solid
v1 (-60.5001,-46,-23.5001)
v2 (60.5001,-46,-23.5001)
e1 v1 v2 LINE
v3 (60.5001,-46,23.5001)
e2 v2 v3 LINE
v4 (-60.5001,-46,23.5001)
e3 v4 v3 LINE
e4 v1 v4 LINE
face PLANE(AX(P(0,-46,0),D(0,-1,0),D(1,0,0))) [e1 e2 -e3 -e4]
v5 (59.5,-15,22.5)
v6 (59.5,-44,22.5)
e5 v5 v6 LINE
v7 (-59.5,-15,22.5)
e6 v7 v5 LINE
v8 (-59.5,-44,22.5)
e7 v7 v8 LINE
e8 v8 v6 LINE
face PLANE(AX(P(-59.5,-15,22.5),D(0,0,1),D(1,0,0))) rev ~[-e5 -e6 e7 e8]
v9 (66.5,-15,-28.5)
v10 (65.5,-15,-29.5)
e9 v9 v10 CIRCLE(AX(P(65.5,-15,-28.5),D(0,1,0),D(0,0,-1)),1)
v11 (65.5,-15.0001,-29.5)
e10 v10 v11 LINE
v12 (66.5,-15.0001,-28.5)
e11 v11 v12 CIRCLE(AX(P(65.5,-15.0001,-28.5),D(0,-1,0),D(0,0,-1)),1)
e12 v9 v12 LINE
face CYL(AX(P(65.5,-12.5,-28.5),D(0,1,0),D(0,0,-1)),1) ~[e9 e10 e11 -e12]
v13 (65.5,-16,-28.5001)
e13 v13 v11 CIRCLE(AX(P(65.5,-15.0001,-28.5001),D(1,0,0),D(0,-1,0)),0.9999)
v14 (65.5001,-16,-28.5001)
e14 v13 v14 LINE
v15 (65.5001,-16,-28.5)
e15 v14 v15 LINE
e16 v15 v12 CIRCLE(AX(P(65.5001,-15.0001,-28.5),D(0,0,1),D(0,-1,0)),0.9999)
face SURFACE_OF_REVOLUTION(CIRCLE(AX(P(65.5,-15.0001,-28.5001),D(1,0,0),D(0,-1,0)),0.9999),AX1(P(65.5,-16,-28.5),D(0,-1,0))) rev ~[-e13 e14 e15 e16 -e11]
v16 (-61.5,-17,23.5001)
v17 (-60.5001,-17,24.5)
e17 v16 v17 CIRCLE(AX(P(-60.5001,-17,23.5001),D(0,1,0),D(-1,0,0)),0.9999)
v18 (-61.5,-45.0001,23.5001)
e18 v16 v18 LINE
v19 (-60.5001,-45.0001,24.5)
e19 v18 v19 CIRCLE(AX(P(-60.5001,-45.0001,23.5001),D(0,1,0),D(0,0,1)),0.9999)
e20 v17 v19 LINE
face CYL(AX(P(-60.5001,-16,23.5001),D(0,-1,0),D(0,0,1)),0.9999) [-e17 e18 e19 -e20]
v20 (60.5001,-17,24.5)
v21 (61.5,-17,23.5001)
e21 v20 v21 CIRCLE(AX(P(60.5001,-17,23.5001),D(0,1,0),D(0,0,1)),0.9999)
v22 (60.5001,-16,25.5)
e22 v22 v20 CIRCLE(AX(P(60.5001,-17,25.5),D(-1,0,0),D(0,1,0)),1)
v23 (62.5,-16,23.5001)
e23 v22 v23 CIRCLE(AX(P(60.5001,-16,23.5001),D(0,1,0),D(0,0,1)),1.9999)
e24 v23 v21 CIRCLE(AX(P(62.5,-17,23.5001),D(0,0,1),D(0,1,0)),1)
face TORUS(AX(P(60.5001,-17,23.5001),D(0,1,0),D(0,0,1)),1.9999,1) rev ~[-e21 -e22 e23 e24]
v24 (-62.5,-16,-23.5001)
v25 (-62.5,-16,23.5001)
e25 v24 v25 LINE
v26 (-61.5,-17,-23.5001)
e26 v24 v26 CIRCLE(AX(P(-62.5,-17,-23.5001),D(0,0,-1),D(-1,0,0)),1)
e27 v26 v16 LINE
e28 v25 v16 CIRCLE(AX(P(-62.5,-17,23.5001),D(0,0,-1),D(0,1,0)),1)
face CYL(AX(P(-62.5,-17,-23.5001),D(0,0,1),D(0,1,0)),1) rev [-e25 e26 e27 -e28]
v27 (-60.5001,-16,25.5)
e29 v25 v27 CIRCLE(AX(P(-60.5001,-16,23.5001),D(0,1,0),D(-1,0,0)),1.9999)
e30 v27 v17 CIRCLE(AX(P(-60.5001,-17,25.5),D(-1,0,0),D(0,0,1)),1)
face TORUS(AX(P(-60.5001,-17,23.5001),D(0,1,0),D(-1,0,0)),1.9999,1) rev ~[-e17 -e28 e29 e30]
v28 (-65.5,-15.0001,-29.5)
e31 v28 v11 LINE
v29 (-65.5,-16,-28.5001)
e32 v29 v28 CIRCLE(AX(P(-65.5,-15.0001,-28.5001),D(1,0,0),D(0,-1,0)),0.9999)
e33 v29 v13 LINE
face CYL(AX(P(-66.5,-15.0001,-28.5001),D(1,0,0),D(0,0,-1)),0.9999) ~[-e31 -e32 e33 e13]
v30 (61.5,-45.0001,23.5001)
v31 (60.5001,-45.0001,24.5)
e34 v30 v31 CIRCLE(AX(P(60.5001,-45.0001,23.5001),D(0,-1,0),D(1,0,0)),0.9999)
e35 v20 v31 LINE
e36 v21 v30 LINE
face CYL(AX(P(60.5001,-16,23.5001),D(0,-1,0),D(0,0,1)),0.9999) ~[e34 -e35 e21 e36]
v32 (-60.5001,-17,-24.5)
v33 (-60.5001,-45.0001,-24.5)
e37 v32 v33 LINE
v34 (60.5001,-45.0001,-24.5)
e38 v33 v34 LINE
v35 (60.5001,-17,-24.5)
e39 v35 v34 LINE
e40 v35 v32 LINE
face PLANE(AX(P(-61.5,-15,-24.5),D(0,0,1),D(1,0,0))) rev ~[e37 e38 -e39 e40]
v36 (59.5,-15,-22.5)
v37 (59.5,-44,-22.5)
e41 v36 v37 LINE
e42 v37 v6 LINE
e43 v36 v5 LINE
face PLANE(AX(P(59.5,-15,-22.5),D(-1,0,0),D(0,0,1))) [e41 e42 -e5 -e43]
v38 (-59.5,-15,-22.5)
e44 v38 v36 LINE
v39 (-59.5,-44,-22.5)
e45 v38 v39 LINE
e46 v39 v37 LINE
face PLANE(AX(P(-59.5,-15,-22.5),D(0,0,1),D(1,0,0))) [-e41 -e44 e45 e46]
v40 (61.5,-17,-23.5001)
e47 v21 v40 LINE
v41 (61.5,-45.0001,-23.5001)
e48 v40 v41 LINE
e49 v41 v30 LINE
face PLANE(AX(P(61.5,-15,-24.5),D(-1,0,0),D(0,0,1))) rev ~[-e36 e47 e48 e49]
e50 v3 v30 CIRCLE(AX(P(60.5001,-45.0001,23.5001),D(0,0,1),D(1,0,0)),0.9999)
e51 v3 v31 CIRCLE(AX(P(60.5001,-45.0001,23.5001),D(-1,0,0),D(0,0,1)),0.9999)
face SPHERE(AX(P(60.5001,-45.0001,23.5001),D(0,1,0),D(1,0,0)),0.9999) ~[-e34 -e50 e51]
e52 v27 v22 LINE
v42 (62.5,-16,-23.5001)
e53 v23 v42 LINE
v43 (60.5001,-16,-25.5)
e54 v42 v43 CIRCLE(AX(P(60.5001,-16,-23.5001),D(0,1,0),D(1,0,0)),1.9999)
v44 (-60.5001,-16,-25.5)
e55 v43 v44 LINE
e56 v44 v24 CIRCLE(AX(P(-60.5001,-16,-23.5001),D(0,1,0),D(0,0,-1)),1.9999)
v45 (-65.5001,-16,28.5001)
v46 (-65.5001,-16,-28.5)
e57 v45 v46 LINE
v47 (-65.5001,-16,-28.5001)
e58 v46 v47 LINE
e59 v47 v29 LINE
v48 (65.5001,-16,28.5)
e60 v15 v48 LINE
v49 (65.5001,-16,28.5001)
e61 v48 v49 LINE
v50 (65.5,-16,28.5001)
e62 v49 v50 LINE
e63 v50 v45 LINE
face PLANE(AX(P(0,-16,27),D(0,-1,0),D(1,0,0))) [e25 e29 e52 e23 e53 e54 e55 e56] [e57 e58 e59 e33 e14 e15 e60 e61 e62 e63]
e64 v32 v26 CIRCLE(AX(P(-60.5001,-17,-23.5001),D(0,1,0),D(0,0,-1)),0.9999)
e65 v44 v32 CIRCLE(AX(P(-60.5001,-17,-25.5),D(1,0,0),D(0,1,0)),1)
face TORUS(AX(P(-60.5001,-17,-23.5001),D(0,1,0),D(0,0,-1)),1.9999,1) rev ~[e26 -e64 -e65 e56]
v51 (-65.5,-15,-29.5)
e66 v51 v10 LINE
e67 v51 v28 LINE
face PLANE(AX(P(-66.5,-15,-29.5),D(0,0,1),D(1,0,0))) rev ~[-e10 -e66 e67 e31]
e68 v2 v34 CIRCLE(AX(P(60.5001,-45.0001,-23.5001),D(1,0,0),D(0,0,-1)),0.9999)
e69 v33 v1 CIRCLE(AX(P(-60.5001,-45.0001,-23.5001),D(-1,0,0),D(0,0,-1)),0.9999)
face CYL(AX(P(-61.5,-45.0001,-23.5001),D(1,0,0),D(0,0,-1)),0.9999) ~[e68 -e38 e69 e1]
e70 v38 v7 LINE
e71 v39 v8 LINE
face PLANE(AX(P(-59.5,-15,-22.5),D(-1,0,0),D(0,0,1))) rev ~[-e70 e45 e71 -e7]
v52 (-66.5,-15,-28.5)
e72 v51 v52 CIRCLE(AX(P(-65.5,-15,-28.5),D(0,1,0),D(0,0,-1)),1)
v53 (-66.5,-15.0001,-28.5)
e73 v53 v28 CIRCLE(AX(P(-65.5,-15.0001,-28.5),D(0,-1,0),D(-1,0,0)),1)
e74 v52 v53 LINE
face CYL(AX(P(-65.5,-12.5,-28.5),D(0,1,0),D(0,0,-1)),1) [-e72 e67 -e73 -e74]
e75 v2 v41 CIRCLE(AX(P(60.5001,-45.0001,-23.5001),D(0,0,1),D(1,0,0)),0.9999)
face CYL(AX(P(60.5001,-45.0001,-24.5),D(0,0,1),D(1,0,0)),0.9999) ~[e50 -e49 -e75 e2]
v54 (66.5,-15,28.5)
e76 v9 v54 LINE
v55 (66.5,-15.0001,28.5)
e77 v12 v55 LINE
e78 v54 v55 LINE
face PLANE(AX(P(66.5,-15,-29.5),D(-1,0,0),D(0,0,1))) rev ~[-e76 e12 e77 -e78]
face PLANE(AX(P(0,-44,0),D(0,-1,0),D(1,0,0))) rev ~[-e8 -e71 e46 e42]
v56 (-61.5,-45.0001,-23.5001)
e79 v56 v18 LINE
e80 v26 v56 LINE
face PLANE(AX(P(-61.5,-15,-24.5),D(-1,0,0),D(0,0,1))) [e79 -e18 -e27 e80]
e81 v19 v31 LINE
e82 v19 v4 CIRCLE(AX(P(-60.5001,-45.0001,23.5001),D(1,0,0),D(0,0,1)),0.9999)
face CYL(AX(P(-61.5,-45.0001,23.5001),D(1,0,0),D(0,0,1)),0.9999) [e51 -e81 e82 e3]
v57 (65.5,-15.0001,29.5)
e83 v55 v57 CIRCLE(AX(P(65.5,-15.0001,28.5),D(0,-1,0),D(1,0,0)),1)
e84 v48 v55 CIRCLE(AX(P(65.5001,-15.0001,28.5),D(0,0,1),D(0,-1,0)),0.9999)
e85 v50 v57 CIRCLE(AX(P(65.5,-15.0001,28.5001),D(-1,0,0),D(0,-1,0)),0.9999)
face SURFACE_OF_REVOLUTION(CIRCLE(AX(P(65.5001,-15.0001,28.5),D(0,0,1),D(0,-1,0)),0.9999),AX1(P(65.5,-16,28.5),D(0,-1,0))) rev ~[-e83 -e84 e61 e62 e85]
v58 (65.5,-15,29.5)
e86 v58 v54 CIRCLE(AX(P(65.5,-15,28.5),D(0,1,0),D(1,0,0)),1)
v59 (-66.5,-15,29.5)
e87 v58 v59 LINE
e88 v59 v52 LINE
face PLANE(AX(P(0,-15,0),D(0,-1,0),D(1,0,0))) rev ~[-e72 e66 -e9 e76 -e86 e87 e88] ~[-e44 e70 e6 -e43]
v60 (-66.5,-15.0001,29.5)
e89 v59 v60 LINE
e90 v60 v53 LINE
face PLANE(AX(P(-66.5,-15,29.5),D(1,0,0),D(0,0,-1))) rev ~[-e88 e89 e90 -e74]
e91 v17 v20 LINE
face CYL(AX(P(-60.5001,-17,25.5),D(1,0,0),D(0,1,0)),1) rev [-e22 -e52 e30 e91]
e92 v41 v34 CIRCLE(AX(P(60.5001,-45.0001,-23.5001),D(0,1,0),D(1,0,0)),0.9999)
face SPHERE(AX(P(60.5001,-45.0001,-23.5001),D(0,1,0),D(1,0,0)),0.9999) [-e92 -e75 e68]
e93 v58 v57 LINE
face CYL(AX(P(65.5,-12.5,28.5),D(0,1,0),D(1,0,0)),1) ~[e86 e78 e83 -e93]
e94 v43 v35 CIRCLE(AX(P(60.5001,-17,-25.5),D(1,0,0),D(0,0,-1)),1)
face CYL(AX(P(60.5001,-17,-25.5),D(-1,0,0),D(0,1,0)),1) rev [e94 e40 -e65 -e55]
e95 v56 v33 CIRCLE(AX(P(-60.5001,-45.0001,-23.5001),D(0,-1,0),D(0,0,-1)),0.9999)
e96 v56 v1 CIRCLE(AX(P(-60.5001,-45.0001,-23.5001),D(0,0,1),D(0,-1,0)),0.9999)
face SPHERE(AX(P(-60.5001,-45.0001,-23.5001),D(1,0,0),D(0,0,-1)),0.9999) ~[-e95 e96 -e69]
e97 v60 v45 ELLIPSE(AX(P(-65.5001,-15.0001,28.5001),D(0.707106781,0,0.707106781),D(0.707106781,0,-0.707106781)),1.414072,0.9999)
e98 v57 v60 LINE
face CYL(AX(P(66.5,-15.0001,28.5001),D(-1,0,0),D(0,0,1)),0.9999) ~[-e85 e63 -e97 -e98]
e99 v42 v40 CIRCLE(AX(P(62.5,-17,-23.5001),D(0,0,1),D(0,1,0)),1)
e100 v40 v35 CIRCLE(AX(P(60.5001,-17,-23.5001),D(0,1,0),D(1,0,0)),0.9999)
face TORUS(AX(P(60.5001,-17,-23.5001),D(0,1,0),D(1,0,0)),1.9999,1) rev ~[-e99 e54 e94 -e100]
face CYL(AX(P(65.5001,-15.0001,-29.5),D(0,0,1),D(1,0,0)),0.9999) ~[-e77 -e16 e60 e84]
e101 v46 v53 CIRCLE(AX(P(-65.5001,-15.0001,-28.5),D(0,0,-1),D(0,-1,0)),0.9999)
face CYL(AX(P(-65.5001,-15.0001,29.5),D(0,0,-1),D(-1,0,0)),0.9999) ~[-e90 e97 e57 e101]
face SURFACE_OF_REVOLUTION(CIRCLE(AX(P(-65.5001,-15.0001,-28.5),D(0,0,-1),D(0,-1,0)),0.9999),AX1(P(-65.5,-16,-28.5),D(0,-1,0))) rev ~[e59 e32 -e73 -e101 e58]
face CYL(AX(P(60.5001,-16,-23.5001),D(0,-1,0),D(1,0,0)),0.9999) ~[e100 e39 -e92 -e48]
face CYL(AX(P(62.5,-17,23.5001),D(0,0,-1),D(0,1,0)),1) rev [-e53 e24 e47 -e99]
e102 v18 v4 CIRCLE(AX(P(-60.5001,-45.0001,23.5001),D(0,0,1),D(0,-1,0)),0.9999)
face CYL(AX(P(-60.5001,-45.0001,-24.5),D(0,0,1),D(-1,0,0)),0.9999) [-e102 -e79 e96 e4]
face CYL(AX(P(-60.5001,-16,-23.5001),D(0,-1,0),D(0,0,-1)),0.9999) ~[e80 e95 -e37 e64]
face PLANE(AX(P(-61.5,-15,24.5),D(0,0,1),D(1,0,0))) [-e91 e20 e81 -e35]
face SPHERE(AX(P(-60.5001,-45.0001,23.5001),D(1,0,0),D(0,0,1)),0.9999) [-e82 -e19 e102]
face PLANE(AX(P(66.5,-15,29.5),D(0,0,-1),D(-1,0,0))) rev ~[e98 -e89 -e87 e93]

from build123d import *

# Parameters (mm, degrees)
F1_W        = 123
F1_H        = 49
F1_W_2      = 119
F1_H_2      = 45
F2_DEPTH    = 31
F1_H_3      = 5
F3_DEPTH    = 1
F4_DEPTH    = 31
F5_DEPTH    = 29
F6_F1_R     = 0.9999
F6_F2_R     = 1
F7_T1_DEPTH = 3.5
F7_T4_ANGLE = 90
F7_T6_ANGLE = 90
F7_T8_ANGLE = 90


# Not quite as in the source:
# - a fillet or chamfer that OpenCascade refuses, or shapes differently, is made with other operations: its cross-section is extruded or revolved along the edge and cut away or added
# - a fillet or chamfer is up to 0.001 mm smaller than in the source, because OpenCascade refuses the exact size


with BuildPart() as f2:
    # F1 (on offset) → F2 (new body)
    with BuildSketch(Plane.XZ.offset(15)):
        Rectangle(F1_W, F1_H)
        Rectangle(F1_W_2, F1_H_2, mode=Mode.SUBTRACT)
    extrude(amount=F2_DEPTH)

    # F1 (on offset) → F3 (join)
    with BuildSketch(Plane.XZ.offset(15)):
        with Locations((0, 27)):
            Rectangle(F1_W, F1_H_3)
        Polygon((-61.5, -29.5), (-61.5, -24.5), (-61.5, 24.5), (-61.5, 29.5), (-66.5, 29.5), (-66.5, -29.5), align=None)
        with Locations((0, -27)):
            Rectangle(F1_W, F1_H_3)
        Polygon((61.5, 24.5), (61.5, -24.5), (61.5, -29.5), (66.5, -29.5), (66.5, 29.5), (61.5, 29.5), align=None)
    extrude(amount=F3_DEPTH)

    # F1 (on offset) → F4 (join)
    with BuildSketch(Plane.XZ.offset(15)):
        Rectangle(F1_W_2, F1_H_2)
    extrude(amount=F4_DEPTH)

    # F1 (on offset) → F5 (cut)
    with BuildSketch(Plane.XZ.offset(15)):
        Rectangle(F1_W_2, F1_H_2)
    extrude(amount=F5_DEPTH, mode=Mode.SUBTRACT)

    # F6: fillet of radius 1 on 14 edges, made by hand

    # F6_f1 (radius 1 in the source; OpenCascade refuses exactly that, so slightly less here)
    f6_f1_edges = [f2.edges().sort_by_distance(p)[0] for p in [
        (61.5, -31, 24.5),
        (61.5, -31, -24.5),
        (61.5, -46, 0),
        (0, -46, -24.5),
        (0, -46, 24.5),
        (-61.5, -31, -24.5),
        (-61.5, -31, 24.5),
        (-61.5, -46, 0),
        (0, -16, -29.5),
        (-66.5, -16, 0),
        (0, -16, 29.5),
        (66.5, -16, 0),
    ]]
    fillet(f6_f1_edges, radius=F6_F1_R)

    # F6_f2
    f6_f2_edges = [f2.edges().sort_by_distance(p)[0] for p in [
        (61.5, -16, 0),
        (-61.5, -16, 0),
        (-61.2071360705, -16, -24.2071360705),
        (-61.2071360705, -16, 24.2071360705),
        (61.2071360705, -16, 24.2071360705),
        (61.2071360705, -16, -24.2071360705),
    ]]
    fillet(f6_f2_edges, radius=F6_F2_R)

    # F7: fillet of radius 1 on 7 edges, made by hand

    # F7_s2 → F7_t1 (cut)
    with BuildSketch(Plane.XZ.offset(12.5)):
        with BuildLine():
            ThreePointArc((-65.5, -29.5), (-66.2071067812, -29.2071067812), (-66.5, -28.5))
            Line((-66.5, -28.5), (-66.5, -29.5))
            Line((-66.5, -29.5), (-65.5, -29.5))
        make_face()
        with BuildLine():
            ThreePointArc((65.5, -29.5), (66.2071067812, -29.2071067812), (66.5, -28.5))
            Line((66.5, -28.5), (66.5, -29.5))
            Line((66.5, -29.5), (65.5, -29.5))
        make_face()
        with BuildLine():
            ThreePointArc((66.5, 28.5), (66.2071067812, 29.2071067812), (65.5, 29.5))
            Line((65.5, 29.5), (66.5, 29.5))
            Line((66.5, 29.5), (66.5, 28.5))
        make_face()
    extrude(amount=F7_T1_DEPTH, mode=Mode.SUBTRACT)

    # F7_s3 → F7_t4 (revolve, cut)
    with BuildSketch(Plane.XY.offset(-28.5)):
        with BuildLine():
            ThreePointArc((-65.5001, -16), (-66.2071360705, -15.7071360705), (-66.5, -15.0001))
            Line((-66.5, -15.0001), (-66.5, -16))
            Line((-66.5, -16), (-65.5001, -16))
        make_face()
    revolve(axis=Axis((-65.5, -16, -28.5), (0, -1, 0)), revolution_arc=F7_T4_ANGLE, mode=Mode.SUBTRACT)

    # F7_s5 → F7_t6 (revolve, cut)
    with BuildSketch(Plane.YZ.offset(65.5)):
        with BuildLine():
            ThreePointArc((-16, -28.5001), (-15.7071360705, -29.2071360705), (-15.0001, -29.5))
            Line((-15.0001, -29.5), (-16, -29.5))
            Line((-16, -29.5), (-16, -28.5001))
        make_face()
    revolve(axis=Axis((65.5, -16, -28.5), (0, -1, 0)), revolution_arc=F7_T6_ANGLE, mode=Mode.SUBTRACT)

    # F7_s7 → F7_t8 (revolve, cut)
    with BuildSketch(Plane.XY.offset(28.5)):
        with BuildLine():
            ThreePointArc((65.5001, -16), (66.2071360705, -15.7071360705), (66.5, -15.0001))
            Line((66.5, -15.0001), (66.5, -16))
            Line((66.5, -16), (65.5001, -16))
        make_face()
    revolve(axis=Axis((65.5, -16, 28.5), (0, -1, 0)), revolution_arc=F7_T8_ANGLE, mode=Mode.SUBTRACT)


solid = f2.part
